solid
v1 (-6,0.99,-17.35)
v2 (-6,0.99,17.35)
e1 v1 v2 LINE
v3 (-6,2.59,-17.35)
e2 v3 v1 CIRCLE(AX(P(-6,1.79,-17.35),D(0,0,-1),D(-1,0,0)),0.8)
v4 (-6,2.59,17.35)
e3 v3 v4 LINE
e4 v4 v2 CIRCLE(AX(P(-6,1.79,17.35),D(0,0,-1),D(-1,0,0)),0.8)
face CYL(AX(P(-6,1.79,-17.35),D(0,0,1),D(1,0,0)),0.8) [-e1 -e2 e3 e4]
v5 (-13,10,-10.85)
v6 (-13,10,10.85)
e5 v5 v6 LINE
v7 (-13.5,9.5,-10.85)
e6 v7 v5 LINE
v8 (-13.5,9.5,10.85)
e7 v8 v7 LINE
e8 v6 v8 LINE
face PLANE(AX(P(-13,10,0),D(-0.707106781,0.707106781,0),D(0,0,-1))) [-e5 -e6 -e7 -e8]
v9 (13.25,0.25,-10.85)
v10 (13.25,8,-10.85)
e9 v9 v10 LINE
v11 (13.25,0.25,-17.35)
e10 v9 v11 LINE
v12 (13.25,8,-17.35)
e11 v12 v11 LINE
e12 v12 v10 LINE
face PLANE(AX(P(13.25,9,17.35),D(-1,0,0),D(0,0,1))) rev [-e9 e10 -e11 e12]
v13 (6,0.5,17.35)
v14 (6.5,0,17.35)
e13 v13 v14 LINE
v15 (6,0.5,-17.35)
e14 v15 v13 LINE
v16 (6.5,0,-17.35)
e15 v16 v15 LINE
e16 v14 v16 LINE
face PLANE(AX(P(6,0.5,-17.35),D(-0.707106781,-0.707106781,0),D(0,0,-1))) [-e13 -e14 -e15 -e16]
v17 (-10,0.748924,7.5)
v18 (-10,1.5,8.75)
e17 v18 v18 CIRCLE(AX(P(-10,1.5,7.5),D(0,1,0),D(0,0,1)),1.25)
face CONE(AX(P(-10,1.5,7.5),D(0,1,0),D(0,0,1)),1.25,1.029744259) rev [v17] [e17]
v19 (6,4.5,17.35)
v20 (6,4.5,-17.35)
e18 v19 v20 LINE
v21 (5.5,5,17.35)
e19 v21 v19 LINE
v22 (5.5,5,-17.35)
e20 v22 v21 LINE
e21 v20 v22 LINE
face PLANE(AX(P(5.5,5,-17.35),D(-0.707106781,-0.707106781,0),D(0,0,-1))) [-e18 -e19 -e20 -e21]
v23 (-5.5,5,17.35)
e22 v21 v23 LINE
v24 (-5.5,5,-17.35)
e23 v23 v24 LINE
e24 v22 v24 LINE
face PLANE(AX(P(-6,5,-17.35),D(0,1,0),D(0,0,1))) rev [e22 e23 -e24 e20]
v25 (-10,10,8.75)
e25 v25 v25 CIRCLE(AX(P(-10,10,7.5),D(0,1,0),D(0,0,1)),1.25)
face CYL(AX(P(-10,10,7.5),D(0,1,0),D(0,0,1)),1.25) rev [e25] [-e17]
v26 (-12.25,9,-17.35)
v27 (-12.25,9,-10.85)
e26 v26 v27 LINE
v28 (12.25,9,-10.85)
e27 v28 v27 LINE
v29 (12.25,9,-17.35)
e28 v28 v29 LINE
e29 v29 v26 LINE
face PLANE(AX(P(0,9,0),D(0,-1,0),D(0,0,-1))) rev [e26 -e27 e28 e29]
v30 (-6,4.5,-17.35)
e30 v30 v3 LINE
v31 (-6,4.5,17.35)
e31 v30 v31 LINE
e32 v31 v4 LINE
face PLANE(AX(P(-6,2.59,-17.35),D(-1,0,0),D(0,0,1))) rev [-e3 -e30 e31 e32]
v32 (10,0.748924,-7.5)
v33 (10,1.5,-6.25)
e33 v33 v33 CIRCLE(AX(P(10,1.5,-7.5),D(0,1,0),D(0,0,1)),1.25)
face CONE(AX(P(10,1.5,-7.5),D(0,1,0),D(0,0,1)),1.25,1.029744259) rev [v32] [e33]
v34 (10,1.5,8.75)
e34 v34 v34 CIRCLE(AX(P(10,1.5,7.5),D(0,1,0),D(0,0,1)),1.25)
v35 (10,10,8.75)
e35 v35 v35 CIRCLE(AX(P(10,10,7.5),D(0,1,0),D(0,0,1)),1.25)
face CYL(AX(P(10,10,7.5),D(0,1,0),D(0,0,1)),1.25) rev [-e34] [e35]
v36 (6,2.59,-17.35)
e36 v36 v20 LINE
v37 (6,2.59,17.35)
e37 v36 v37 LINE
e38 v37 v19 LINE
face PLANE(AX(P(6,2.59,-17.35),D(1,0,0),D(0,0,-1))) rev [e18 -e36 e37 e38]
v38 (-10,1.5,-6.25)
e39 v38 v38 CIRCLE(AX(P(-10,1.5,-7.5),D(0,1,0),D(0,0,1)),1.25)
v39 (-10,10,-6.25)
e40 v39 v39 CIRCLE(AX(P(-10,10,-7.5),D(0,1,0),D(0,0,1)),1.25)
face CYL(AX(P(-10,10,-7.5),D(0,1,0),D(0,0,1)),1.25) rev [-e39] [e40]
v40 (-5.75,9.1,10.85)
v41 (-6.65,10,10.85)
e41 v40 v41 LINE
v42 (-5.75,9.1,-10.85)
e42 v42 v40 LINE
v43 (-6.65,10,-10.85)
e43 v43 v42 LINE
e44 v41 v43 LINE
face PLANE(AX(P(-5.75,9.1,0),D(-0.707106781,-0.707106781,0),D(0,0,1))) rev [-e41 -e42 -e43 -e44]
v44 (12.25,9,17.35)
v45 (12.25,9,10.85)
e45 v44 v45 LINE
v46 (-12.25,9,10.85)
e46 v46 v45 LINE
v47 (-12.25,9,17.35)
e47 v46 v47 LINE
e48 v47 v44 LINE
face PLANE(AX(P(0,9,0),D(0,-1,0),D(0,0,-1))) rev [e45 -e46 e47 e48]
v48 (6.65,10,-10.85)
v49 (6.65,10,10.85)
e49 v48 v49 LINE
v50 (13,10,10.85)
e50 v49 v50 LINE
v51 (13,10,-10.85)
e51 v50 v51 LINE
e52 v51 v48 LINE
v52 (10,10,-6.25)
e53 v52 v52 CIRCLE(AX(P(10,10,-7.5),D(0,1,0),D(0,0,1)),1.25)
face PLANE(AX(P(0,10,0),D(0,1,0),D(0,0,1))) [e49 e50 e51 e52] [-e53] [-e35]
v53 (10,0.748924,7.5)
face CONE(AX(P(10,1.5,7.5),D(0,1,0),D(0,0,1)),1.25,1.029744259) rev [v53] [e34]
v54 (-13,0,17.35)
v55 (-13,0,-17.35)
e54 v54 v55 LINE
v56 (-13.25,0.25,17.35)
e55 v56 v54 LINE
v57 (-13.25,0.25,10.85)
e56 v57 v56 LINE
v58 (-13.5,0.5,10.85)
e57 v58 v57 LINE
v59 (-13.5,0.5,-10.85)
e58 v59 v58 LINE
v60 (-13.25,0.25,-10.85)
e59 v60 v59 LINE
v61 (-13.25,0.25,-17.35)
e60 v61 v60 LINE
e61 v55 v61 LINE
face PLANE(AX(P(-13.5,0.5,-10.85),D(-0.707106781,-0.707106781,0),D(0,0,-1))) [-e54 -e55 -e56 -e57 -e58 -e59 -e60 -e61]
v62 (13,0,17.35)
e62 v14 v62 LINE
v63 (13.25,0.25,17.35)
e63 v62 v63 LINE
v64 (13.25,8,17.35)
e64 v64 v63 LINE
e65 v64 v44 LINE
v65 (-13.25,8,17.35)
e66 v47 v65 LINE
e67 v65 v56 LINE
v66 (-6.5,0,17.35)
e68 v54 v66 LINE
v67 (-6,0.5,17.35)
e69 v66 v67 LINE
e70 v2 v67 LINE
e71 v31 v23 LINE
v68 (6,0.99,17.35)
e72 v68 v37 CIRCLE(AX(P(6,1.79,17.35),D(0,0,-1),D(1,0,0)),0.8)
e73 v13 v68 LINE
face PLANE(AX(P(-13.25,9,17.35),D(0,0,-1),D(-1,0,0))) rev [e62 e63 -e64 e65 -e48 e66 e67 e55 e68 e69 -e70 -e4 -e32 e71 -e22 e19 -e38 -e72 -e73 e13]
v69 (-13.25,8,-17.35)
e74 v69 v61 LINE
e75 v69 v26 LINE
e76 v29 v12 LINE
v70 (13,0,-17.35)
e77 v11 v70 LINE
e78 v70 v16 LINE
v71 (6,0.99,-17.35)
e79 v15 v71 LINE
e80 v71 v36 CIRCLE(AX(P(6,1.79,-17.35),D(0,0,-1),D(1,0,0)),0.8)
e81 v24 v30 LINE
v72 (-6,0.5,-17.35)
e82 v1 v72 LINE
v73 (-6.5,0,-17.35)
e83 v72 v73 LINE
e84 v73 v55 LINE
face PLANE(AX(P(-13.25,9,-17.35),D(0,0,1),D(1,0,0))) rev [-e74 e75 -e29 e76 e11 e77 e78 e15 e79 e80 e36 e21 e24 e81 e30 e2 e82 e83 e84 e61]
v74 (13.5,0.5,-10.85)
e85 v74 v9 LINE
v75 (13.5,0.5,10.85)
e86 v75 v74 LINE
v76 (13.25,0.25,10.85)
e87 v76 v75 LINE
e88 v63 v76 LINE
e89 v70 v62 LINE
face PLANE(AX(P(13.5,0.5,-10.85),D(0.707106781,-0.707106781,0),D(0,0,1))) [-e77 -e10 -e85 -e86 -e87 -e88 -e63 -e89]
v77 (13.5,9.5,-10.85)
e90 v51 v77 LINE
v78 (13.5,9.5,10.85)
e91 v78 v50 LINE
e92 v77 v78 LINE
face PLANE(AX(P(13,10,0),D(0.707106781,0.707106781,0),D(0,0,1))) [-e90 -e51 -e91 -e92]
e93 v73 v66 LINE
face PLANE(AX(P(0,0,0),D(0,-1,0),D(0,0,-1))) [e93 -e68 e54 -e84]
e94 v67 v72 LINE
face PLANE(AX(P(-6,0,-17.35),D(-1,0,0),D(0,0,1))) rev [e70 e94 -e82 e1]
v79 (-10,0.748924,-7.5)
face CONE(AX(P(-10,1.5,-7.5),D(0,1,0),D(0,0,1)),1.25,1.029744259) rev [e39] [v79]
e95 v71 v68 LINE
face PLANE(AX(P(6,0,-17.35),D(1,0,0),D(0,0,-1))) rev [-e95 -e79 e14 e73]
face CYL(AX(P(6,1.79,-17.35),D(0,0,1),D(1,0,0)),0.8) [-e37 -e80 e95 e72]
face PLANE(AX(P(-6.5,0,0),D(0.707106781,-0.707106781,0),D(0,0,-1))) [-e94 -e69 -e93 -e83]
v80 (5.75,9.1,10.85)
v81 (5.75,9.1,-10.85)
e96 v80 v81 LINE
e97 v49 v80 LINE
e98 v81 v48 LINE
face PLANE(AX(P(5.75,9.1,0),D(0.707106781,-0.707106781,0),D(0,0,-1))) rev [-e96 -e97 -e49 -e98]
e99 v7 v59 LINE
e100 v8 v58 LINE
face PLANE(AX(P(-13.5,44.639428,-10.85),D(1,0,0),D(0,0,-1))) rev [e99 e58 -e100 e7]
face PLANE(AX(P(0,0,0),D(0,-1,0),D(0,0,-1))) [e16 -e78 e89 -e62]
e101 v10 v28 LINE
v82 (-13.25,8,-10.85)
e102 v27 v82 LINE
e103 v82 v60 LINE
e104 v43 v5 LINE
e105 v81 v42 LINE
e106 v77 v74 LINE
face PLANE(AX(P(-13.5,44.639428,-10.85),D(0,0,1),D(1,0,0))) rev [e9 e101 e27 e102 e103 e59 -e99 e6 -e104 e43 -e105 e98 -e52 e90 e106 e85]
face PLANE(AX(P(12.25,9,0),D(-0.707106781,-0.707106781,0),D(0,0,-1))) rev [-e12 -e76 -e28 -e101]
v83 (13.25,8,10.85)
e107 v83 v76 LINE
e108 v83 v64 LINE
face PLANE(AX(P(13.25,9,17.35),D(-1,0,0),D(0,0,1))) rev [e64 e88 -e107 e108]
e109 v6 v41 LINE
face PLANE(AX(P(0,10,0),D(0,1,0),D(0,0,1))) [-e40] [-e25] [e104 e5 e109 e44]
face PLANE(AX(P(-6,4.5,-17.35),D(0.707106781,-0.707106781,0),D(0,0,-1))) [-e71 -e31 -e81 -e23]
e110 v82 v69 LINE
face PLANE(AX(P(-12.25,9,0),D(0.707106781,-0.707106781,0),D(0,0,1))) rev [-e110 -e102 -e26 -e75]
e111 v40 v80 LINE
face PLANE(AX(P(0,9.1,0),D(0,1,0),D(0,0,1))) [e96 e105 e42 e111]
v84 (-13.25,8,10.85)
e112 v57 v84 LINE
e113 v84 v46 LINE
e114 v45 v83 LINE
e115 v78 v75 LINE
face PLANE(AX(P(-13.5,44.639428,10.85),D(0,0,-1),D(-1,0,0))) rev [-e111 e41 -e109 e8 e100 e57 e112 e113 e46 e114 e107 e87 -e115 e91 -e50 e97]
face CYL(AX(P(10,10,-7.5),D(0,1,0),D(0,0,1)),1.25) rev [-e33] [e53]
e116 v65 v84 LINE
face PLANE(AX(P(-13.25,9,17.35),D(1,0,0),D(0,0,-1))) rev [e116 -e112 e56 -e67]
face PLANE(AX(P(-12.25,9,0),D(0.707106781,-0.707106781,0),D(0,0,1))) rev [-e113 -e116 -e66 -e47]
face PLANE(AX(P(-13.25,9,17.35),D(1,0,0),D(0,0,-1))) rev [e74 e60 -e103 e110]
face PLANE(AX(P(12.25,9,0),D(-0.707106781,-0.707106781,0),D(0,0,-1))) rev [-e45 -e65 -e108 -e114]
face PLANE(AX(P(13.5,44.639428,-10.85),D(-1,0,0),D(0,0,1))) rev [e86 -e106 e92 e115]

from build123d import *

# Parameters (mm, degrees)
MAINBLOCKSKETCH_W              = 26.5
MAINBLOCKSKETCH_H              = 34.7
MAINBLOCK_DEPTH                = 9
FACEDSURFACESKETCH_W           = 27
FACEDSURFACESKETCH_H           = 21.7
FACEDSURFACE_DEPTH             = 10
M3X0_5_TAPPED_HOLE1_D          = 2.5
M3X0_5_TAPPED_HOLE1_DEPTH      = 8.5
M3X0_5_TAPPED_HOLE1_TIP        = 0.751075774
RAIL_SLOT_DEPTH                = 25.151035175
RAIL_SLOT_DEPTH_BACK           = 25.151035175
INTERNAL_DIP_SKETCH_W          = 13.5
INTERNAL_DIP_SKETCH_H          = 21.7
INTERNAL_DIP_DEPTH             = 0.9
INTERNAL_CHAMFER_SIZE          = 0.5
COSMETIC_CHAMFERS_SIZE         = 1
SMALLER_COSMETIC_CHAMFERS_SIZE = 0.5


with BuildPart() as part:
    # MainBlockSketch → MainBlock (new body)
    with BuildSketch(Plane(origin=(0, 0, 0), x_dir=(1, 0, 0), z_dir=(0, 1, 0))):
        Rectangle(MAINBLOCKSKETCH_W, MAINBLOCKSKETCH_H)
    extrude(amount=MAINBLOCK_DEPTH)

    # FacedSurfaceSketch → FacedSurface (add)
    with BuildSketch(Plane(origin=(0, 0, 0), x_dir=(1, 0, 0), z_dir=(0, 1, 0))):
        Rectangle(FACEDSURFACESKETCH_W, FACEDSURFACESKETCH_H)
    extrude(amount=FACEDSURFACE_DEPTH)

    # M3x0.5 Tapped Hole1
    with Locations(Plane(origin=(0, 10, 0), x_dir=(1, 0, 0), z_dir=(0, 1, 0))):
        with Locations((-10, 7.5), (10, 7.5), (10, -7.5), (-10, -7.5)):
            Hole(M3X0_5_TAPPED_HOLE1_D / 2, depth=M3X0_5_TAPPED_HOLE1_DEPTH)
            with Locations((0, 0, -(M3X0_5_TAPPED_HOLE1_DEPTH + M3X0_5_TAPPED_HOLE1_TIP / 2))):  # 118° drill point
                Cone(0, M3X0_5_TAPPED_HOLE1_D / 2, M3X0_5_TAPPED_HOLE1_TIP, mode=Mode.SUBTRACT)

    # RailSlotSketch → Rail Slot (cut, two sides: drawn at the far end of the back side and taken through both)
    with BuildSketch(Plane.XY.offset(-RAIL_SLOT_DEPTH_BACK)):
        with BuildLine():
            Line((-6, 2.59), (-6, 5))
            Line((-6, 5), (6, 5))
            Line((6, 5), (6, 2.59))
            ThreePointArc((6, 2.59), (5.2, 1.79), (6, 0.99))
            Line((6, 0.99), (6, 0))
            Line((6, 0), (-6, 0))
            Line((-6, 0), (-6, 0.99))
            ThreePointArc((-6, 0.99), (-5.2, 1.79), (-6, 2.59))
        make_face()
    extrude(amount=RAIL_SLOT_DEPTH + RAIL_SLOT_DEPTH_BACK, mode=Mode.SUBTRACT)

    # Internal Dip Sketch → Internal Dip (cut)
    with BuildSketch(Plane(origin=(0, 10, 0), x_dir=(1, 0, 0), z_dir=(0, 1, 0))):
        Rectangle(INTERNAL_DIP_SKETCH_W, INTERNAL_DIP_SKETCH_H)
    extrude(amount=-INTERNAL_DIP_DEPTH, mode=Mode.SUBTRACT)

    # Internal Chamfer
    internal_chamfer_edges = [part.edges().sort_by_distance(p)[0] for p in [
        (6, 5, 0),
        (-6, 5, 0),
    ]]
    chamfer(internal_chamfer_edges, length=INTERNAL_CHAMFER_SIZE)

    # Cosmetic Chamfers
    # the kernel refuses this chamfer: 1 mm, written as the material it adds along each edge
    with BuildSketch(Plane(origin=(-6.75, 9.1, 10.85), x_dir=(0.9996219169112968, -0.027495876610585623, 0), z_dir=(0, 0, -1))) as cosmetic_chamfers_piece_1_section:
        Polygon((COSMETIC_CHAMFERS_SIZE * 0.999621916911, -COSMETIC_CHAMFERS_SIZE * 0.0274958766106), (-COSMETIC_CHAMFERS_SIZE * 0.0274958766106, -COSMETIC_CHAMFERS_SIZE * 0.999621916911), (0, 0), align=None)
    cosmetic_chamfers_piece_1 = extrude(amount=21.7, mode=Mode.PRIVATE)
    cosmetic_chamfers_piece_1 = split(cosmetic_chamfers_piece_1, bisect_by=Plane(origin=(-6.414099253, 10, 0), z_dir=(0, -1, 0)), keep=Keep.TOP, mode=Mode.PRIVATE)
    add(cosmetic_chamfers_piece_1)
    with BuildSketch(Plane(origin=(6.75, 9.1, -10.85), x_dir=(0.02749587661058651, 0.9996219169112968, 0), z_dir=(0, 0, 1))) as cosmetic_chamfers_piece_2_section:
        Polygon((COSMETIC_CHAMFERS_SIZE * 0.999621916911, COSMETIC_CHAMFERS_SIZE * 0.0274958766106), (-COSMETIC_CHAMFERS_SIZE * 0.0274958766106, COSMETIC_CHAMFERS_SIZE * 0.999621916911), (0, 0), align=None)
    cosmetic_chamfers_piece_2 = extrude(amount=21.7, mode=Mode.PRIVATE)
    cosmetic_chamfers_piece_2 = split(cosmetic_chamfers_piece_2, bisect_by=Plane(origin=(6.414099253, 10, 0), z_dir=(0, -1, 0)), keep=Keep.TOP, mode=Mode.PRIVATE)
    add(cosmetic_chamfers_piece_2)
    # the kernel refuses this chamfer: 1 mm, written as the material it takes off along each edge
    with BuildSketch(Plane(origin=(13.25, 9, 19.921682988), x_dir=(0.027495876610585623, -0.9996219169112968, 0), z_dir=(0, 0, -1))) as cosmetic_chamfers_2_piece_1:
        Polygon((COSMETIC_CHAMFERS_SIZE * 0.999621916911, COSMETIC_CHAMFERS_SIZE * 0.0274958766106), (-COSMETIC_CHAMFERS_SIZE * 0.0274958766106, COSMETIC_CHAMFERS_SIZE * 0.999621916911), (0, 0), align=None)
    extrude(amount=9.071682988, mode=Mode.SUBTRACT)
    with BuildSketch(Plane(origin=(-13.25, 9, 10.85), x_dir=(0.9996219169112968, 0.027495876610585647, 0), z_dir=(0, 0, 1)), Plane(origin=(-13.25, 9, -19.921682988), x_dir=(0.9996219169112968, 0.027495876610585647, 0), z_dir=(0, 0, 1)), Plane(origin=(13.25, 9, -10.85), x_dir=(-0.9996219169112968, 0.027495876610585647, 0), z_dir=(0, 0, -1))) as cosmetic_chamfers_2_piece_2:
        Polygon((COSMETIC_CHAMFERS_SIZE * 0.999621916911, -COSMETIC_CHAMFERS_SIZE * 0.0274958766106), (-COSMETIC_CHAMFERS_SIZE * 0.0274958766106, -COSMETIC_CHAMFERS_SIZE * 0.999621916911), (0, 0), align=None)
    extrude(amount=9.071682988, mode=Mode.SUBTRACT)

    # Smaller Cosmetic Chamfers
    smaller_cosmetic_chamfers_edges = [part.edges().sort_by_distance(p)[0] for p in [
        (13.5, 10, 0),
        (-13.5, 10, 0),
        (-13.5, 0, 0),
        (13.5, 0, 0),
        (6, 0, 0),
        (-6, 0, 0),
    ]]
    chamfer(smaller_cosmetic_chamfers_edges, length=SMALLER_COSMETIC_CHAMFERS_SIZE)


solid = part.part
